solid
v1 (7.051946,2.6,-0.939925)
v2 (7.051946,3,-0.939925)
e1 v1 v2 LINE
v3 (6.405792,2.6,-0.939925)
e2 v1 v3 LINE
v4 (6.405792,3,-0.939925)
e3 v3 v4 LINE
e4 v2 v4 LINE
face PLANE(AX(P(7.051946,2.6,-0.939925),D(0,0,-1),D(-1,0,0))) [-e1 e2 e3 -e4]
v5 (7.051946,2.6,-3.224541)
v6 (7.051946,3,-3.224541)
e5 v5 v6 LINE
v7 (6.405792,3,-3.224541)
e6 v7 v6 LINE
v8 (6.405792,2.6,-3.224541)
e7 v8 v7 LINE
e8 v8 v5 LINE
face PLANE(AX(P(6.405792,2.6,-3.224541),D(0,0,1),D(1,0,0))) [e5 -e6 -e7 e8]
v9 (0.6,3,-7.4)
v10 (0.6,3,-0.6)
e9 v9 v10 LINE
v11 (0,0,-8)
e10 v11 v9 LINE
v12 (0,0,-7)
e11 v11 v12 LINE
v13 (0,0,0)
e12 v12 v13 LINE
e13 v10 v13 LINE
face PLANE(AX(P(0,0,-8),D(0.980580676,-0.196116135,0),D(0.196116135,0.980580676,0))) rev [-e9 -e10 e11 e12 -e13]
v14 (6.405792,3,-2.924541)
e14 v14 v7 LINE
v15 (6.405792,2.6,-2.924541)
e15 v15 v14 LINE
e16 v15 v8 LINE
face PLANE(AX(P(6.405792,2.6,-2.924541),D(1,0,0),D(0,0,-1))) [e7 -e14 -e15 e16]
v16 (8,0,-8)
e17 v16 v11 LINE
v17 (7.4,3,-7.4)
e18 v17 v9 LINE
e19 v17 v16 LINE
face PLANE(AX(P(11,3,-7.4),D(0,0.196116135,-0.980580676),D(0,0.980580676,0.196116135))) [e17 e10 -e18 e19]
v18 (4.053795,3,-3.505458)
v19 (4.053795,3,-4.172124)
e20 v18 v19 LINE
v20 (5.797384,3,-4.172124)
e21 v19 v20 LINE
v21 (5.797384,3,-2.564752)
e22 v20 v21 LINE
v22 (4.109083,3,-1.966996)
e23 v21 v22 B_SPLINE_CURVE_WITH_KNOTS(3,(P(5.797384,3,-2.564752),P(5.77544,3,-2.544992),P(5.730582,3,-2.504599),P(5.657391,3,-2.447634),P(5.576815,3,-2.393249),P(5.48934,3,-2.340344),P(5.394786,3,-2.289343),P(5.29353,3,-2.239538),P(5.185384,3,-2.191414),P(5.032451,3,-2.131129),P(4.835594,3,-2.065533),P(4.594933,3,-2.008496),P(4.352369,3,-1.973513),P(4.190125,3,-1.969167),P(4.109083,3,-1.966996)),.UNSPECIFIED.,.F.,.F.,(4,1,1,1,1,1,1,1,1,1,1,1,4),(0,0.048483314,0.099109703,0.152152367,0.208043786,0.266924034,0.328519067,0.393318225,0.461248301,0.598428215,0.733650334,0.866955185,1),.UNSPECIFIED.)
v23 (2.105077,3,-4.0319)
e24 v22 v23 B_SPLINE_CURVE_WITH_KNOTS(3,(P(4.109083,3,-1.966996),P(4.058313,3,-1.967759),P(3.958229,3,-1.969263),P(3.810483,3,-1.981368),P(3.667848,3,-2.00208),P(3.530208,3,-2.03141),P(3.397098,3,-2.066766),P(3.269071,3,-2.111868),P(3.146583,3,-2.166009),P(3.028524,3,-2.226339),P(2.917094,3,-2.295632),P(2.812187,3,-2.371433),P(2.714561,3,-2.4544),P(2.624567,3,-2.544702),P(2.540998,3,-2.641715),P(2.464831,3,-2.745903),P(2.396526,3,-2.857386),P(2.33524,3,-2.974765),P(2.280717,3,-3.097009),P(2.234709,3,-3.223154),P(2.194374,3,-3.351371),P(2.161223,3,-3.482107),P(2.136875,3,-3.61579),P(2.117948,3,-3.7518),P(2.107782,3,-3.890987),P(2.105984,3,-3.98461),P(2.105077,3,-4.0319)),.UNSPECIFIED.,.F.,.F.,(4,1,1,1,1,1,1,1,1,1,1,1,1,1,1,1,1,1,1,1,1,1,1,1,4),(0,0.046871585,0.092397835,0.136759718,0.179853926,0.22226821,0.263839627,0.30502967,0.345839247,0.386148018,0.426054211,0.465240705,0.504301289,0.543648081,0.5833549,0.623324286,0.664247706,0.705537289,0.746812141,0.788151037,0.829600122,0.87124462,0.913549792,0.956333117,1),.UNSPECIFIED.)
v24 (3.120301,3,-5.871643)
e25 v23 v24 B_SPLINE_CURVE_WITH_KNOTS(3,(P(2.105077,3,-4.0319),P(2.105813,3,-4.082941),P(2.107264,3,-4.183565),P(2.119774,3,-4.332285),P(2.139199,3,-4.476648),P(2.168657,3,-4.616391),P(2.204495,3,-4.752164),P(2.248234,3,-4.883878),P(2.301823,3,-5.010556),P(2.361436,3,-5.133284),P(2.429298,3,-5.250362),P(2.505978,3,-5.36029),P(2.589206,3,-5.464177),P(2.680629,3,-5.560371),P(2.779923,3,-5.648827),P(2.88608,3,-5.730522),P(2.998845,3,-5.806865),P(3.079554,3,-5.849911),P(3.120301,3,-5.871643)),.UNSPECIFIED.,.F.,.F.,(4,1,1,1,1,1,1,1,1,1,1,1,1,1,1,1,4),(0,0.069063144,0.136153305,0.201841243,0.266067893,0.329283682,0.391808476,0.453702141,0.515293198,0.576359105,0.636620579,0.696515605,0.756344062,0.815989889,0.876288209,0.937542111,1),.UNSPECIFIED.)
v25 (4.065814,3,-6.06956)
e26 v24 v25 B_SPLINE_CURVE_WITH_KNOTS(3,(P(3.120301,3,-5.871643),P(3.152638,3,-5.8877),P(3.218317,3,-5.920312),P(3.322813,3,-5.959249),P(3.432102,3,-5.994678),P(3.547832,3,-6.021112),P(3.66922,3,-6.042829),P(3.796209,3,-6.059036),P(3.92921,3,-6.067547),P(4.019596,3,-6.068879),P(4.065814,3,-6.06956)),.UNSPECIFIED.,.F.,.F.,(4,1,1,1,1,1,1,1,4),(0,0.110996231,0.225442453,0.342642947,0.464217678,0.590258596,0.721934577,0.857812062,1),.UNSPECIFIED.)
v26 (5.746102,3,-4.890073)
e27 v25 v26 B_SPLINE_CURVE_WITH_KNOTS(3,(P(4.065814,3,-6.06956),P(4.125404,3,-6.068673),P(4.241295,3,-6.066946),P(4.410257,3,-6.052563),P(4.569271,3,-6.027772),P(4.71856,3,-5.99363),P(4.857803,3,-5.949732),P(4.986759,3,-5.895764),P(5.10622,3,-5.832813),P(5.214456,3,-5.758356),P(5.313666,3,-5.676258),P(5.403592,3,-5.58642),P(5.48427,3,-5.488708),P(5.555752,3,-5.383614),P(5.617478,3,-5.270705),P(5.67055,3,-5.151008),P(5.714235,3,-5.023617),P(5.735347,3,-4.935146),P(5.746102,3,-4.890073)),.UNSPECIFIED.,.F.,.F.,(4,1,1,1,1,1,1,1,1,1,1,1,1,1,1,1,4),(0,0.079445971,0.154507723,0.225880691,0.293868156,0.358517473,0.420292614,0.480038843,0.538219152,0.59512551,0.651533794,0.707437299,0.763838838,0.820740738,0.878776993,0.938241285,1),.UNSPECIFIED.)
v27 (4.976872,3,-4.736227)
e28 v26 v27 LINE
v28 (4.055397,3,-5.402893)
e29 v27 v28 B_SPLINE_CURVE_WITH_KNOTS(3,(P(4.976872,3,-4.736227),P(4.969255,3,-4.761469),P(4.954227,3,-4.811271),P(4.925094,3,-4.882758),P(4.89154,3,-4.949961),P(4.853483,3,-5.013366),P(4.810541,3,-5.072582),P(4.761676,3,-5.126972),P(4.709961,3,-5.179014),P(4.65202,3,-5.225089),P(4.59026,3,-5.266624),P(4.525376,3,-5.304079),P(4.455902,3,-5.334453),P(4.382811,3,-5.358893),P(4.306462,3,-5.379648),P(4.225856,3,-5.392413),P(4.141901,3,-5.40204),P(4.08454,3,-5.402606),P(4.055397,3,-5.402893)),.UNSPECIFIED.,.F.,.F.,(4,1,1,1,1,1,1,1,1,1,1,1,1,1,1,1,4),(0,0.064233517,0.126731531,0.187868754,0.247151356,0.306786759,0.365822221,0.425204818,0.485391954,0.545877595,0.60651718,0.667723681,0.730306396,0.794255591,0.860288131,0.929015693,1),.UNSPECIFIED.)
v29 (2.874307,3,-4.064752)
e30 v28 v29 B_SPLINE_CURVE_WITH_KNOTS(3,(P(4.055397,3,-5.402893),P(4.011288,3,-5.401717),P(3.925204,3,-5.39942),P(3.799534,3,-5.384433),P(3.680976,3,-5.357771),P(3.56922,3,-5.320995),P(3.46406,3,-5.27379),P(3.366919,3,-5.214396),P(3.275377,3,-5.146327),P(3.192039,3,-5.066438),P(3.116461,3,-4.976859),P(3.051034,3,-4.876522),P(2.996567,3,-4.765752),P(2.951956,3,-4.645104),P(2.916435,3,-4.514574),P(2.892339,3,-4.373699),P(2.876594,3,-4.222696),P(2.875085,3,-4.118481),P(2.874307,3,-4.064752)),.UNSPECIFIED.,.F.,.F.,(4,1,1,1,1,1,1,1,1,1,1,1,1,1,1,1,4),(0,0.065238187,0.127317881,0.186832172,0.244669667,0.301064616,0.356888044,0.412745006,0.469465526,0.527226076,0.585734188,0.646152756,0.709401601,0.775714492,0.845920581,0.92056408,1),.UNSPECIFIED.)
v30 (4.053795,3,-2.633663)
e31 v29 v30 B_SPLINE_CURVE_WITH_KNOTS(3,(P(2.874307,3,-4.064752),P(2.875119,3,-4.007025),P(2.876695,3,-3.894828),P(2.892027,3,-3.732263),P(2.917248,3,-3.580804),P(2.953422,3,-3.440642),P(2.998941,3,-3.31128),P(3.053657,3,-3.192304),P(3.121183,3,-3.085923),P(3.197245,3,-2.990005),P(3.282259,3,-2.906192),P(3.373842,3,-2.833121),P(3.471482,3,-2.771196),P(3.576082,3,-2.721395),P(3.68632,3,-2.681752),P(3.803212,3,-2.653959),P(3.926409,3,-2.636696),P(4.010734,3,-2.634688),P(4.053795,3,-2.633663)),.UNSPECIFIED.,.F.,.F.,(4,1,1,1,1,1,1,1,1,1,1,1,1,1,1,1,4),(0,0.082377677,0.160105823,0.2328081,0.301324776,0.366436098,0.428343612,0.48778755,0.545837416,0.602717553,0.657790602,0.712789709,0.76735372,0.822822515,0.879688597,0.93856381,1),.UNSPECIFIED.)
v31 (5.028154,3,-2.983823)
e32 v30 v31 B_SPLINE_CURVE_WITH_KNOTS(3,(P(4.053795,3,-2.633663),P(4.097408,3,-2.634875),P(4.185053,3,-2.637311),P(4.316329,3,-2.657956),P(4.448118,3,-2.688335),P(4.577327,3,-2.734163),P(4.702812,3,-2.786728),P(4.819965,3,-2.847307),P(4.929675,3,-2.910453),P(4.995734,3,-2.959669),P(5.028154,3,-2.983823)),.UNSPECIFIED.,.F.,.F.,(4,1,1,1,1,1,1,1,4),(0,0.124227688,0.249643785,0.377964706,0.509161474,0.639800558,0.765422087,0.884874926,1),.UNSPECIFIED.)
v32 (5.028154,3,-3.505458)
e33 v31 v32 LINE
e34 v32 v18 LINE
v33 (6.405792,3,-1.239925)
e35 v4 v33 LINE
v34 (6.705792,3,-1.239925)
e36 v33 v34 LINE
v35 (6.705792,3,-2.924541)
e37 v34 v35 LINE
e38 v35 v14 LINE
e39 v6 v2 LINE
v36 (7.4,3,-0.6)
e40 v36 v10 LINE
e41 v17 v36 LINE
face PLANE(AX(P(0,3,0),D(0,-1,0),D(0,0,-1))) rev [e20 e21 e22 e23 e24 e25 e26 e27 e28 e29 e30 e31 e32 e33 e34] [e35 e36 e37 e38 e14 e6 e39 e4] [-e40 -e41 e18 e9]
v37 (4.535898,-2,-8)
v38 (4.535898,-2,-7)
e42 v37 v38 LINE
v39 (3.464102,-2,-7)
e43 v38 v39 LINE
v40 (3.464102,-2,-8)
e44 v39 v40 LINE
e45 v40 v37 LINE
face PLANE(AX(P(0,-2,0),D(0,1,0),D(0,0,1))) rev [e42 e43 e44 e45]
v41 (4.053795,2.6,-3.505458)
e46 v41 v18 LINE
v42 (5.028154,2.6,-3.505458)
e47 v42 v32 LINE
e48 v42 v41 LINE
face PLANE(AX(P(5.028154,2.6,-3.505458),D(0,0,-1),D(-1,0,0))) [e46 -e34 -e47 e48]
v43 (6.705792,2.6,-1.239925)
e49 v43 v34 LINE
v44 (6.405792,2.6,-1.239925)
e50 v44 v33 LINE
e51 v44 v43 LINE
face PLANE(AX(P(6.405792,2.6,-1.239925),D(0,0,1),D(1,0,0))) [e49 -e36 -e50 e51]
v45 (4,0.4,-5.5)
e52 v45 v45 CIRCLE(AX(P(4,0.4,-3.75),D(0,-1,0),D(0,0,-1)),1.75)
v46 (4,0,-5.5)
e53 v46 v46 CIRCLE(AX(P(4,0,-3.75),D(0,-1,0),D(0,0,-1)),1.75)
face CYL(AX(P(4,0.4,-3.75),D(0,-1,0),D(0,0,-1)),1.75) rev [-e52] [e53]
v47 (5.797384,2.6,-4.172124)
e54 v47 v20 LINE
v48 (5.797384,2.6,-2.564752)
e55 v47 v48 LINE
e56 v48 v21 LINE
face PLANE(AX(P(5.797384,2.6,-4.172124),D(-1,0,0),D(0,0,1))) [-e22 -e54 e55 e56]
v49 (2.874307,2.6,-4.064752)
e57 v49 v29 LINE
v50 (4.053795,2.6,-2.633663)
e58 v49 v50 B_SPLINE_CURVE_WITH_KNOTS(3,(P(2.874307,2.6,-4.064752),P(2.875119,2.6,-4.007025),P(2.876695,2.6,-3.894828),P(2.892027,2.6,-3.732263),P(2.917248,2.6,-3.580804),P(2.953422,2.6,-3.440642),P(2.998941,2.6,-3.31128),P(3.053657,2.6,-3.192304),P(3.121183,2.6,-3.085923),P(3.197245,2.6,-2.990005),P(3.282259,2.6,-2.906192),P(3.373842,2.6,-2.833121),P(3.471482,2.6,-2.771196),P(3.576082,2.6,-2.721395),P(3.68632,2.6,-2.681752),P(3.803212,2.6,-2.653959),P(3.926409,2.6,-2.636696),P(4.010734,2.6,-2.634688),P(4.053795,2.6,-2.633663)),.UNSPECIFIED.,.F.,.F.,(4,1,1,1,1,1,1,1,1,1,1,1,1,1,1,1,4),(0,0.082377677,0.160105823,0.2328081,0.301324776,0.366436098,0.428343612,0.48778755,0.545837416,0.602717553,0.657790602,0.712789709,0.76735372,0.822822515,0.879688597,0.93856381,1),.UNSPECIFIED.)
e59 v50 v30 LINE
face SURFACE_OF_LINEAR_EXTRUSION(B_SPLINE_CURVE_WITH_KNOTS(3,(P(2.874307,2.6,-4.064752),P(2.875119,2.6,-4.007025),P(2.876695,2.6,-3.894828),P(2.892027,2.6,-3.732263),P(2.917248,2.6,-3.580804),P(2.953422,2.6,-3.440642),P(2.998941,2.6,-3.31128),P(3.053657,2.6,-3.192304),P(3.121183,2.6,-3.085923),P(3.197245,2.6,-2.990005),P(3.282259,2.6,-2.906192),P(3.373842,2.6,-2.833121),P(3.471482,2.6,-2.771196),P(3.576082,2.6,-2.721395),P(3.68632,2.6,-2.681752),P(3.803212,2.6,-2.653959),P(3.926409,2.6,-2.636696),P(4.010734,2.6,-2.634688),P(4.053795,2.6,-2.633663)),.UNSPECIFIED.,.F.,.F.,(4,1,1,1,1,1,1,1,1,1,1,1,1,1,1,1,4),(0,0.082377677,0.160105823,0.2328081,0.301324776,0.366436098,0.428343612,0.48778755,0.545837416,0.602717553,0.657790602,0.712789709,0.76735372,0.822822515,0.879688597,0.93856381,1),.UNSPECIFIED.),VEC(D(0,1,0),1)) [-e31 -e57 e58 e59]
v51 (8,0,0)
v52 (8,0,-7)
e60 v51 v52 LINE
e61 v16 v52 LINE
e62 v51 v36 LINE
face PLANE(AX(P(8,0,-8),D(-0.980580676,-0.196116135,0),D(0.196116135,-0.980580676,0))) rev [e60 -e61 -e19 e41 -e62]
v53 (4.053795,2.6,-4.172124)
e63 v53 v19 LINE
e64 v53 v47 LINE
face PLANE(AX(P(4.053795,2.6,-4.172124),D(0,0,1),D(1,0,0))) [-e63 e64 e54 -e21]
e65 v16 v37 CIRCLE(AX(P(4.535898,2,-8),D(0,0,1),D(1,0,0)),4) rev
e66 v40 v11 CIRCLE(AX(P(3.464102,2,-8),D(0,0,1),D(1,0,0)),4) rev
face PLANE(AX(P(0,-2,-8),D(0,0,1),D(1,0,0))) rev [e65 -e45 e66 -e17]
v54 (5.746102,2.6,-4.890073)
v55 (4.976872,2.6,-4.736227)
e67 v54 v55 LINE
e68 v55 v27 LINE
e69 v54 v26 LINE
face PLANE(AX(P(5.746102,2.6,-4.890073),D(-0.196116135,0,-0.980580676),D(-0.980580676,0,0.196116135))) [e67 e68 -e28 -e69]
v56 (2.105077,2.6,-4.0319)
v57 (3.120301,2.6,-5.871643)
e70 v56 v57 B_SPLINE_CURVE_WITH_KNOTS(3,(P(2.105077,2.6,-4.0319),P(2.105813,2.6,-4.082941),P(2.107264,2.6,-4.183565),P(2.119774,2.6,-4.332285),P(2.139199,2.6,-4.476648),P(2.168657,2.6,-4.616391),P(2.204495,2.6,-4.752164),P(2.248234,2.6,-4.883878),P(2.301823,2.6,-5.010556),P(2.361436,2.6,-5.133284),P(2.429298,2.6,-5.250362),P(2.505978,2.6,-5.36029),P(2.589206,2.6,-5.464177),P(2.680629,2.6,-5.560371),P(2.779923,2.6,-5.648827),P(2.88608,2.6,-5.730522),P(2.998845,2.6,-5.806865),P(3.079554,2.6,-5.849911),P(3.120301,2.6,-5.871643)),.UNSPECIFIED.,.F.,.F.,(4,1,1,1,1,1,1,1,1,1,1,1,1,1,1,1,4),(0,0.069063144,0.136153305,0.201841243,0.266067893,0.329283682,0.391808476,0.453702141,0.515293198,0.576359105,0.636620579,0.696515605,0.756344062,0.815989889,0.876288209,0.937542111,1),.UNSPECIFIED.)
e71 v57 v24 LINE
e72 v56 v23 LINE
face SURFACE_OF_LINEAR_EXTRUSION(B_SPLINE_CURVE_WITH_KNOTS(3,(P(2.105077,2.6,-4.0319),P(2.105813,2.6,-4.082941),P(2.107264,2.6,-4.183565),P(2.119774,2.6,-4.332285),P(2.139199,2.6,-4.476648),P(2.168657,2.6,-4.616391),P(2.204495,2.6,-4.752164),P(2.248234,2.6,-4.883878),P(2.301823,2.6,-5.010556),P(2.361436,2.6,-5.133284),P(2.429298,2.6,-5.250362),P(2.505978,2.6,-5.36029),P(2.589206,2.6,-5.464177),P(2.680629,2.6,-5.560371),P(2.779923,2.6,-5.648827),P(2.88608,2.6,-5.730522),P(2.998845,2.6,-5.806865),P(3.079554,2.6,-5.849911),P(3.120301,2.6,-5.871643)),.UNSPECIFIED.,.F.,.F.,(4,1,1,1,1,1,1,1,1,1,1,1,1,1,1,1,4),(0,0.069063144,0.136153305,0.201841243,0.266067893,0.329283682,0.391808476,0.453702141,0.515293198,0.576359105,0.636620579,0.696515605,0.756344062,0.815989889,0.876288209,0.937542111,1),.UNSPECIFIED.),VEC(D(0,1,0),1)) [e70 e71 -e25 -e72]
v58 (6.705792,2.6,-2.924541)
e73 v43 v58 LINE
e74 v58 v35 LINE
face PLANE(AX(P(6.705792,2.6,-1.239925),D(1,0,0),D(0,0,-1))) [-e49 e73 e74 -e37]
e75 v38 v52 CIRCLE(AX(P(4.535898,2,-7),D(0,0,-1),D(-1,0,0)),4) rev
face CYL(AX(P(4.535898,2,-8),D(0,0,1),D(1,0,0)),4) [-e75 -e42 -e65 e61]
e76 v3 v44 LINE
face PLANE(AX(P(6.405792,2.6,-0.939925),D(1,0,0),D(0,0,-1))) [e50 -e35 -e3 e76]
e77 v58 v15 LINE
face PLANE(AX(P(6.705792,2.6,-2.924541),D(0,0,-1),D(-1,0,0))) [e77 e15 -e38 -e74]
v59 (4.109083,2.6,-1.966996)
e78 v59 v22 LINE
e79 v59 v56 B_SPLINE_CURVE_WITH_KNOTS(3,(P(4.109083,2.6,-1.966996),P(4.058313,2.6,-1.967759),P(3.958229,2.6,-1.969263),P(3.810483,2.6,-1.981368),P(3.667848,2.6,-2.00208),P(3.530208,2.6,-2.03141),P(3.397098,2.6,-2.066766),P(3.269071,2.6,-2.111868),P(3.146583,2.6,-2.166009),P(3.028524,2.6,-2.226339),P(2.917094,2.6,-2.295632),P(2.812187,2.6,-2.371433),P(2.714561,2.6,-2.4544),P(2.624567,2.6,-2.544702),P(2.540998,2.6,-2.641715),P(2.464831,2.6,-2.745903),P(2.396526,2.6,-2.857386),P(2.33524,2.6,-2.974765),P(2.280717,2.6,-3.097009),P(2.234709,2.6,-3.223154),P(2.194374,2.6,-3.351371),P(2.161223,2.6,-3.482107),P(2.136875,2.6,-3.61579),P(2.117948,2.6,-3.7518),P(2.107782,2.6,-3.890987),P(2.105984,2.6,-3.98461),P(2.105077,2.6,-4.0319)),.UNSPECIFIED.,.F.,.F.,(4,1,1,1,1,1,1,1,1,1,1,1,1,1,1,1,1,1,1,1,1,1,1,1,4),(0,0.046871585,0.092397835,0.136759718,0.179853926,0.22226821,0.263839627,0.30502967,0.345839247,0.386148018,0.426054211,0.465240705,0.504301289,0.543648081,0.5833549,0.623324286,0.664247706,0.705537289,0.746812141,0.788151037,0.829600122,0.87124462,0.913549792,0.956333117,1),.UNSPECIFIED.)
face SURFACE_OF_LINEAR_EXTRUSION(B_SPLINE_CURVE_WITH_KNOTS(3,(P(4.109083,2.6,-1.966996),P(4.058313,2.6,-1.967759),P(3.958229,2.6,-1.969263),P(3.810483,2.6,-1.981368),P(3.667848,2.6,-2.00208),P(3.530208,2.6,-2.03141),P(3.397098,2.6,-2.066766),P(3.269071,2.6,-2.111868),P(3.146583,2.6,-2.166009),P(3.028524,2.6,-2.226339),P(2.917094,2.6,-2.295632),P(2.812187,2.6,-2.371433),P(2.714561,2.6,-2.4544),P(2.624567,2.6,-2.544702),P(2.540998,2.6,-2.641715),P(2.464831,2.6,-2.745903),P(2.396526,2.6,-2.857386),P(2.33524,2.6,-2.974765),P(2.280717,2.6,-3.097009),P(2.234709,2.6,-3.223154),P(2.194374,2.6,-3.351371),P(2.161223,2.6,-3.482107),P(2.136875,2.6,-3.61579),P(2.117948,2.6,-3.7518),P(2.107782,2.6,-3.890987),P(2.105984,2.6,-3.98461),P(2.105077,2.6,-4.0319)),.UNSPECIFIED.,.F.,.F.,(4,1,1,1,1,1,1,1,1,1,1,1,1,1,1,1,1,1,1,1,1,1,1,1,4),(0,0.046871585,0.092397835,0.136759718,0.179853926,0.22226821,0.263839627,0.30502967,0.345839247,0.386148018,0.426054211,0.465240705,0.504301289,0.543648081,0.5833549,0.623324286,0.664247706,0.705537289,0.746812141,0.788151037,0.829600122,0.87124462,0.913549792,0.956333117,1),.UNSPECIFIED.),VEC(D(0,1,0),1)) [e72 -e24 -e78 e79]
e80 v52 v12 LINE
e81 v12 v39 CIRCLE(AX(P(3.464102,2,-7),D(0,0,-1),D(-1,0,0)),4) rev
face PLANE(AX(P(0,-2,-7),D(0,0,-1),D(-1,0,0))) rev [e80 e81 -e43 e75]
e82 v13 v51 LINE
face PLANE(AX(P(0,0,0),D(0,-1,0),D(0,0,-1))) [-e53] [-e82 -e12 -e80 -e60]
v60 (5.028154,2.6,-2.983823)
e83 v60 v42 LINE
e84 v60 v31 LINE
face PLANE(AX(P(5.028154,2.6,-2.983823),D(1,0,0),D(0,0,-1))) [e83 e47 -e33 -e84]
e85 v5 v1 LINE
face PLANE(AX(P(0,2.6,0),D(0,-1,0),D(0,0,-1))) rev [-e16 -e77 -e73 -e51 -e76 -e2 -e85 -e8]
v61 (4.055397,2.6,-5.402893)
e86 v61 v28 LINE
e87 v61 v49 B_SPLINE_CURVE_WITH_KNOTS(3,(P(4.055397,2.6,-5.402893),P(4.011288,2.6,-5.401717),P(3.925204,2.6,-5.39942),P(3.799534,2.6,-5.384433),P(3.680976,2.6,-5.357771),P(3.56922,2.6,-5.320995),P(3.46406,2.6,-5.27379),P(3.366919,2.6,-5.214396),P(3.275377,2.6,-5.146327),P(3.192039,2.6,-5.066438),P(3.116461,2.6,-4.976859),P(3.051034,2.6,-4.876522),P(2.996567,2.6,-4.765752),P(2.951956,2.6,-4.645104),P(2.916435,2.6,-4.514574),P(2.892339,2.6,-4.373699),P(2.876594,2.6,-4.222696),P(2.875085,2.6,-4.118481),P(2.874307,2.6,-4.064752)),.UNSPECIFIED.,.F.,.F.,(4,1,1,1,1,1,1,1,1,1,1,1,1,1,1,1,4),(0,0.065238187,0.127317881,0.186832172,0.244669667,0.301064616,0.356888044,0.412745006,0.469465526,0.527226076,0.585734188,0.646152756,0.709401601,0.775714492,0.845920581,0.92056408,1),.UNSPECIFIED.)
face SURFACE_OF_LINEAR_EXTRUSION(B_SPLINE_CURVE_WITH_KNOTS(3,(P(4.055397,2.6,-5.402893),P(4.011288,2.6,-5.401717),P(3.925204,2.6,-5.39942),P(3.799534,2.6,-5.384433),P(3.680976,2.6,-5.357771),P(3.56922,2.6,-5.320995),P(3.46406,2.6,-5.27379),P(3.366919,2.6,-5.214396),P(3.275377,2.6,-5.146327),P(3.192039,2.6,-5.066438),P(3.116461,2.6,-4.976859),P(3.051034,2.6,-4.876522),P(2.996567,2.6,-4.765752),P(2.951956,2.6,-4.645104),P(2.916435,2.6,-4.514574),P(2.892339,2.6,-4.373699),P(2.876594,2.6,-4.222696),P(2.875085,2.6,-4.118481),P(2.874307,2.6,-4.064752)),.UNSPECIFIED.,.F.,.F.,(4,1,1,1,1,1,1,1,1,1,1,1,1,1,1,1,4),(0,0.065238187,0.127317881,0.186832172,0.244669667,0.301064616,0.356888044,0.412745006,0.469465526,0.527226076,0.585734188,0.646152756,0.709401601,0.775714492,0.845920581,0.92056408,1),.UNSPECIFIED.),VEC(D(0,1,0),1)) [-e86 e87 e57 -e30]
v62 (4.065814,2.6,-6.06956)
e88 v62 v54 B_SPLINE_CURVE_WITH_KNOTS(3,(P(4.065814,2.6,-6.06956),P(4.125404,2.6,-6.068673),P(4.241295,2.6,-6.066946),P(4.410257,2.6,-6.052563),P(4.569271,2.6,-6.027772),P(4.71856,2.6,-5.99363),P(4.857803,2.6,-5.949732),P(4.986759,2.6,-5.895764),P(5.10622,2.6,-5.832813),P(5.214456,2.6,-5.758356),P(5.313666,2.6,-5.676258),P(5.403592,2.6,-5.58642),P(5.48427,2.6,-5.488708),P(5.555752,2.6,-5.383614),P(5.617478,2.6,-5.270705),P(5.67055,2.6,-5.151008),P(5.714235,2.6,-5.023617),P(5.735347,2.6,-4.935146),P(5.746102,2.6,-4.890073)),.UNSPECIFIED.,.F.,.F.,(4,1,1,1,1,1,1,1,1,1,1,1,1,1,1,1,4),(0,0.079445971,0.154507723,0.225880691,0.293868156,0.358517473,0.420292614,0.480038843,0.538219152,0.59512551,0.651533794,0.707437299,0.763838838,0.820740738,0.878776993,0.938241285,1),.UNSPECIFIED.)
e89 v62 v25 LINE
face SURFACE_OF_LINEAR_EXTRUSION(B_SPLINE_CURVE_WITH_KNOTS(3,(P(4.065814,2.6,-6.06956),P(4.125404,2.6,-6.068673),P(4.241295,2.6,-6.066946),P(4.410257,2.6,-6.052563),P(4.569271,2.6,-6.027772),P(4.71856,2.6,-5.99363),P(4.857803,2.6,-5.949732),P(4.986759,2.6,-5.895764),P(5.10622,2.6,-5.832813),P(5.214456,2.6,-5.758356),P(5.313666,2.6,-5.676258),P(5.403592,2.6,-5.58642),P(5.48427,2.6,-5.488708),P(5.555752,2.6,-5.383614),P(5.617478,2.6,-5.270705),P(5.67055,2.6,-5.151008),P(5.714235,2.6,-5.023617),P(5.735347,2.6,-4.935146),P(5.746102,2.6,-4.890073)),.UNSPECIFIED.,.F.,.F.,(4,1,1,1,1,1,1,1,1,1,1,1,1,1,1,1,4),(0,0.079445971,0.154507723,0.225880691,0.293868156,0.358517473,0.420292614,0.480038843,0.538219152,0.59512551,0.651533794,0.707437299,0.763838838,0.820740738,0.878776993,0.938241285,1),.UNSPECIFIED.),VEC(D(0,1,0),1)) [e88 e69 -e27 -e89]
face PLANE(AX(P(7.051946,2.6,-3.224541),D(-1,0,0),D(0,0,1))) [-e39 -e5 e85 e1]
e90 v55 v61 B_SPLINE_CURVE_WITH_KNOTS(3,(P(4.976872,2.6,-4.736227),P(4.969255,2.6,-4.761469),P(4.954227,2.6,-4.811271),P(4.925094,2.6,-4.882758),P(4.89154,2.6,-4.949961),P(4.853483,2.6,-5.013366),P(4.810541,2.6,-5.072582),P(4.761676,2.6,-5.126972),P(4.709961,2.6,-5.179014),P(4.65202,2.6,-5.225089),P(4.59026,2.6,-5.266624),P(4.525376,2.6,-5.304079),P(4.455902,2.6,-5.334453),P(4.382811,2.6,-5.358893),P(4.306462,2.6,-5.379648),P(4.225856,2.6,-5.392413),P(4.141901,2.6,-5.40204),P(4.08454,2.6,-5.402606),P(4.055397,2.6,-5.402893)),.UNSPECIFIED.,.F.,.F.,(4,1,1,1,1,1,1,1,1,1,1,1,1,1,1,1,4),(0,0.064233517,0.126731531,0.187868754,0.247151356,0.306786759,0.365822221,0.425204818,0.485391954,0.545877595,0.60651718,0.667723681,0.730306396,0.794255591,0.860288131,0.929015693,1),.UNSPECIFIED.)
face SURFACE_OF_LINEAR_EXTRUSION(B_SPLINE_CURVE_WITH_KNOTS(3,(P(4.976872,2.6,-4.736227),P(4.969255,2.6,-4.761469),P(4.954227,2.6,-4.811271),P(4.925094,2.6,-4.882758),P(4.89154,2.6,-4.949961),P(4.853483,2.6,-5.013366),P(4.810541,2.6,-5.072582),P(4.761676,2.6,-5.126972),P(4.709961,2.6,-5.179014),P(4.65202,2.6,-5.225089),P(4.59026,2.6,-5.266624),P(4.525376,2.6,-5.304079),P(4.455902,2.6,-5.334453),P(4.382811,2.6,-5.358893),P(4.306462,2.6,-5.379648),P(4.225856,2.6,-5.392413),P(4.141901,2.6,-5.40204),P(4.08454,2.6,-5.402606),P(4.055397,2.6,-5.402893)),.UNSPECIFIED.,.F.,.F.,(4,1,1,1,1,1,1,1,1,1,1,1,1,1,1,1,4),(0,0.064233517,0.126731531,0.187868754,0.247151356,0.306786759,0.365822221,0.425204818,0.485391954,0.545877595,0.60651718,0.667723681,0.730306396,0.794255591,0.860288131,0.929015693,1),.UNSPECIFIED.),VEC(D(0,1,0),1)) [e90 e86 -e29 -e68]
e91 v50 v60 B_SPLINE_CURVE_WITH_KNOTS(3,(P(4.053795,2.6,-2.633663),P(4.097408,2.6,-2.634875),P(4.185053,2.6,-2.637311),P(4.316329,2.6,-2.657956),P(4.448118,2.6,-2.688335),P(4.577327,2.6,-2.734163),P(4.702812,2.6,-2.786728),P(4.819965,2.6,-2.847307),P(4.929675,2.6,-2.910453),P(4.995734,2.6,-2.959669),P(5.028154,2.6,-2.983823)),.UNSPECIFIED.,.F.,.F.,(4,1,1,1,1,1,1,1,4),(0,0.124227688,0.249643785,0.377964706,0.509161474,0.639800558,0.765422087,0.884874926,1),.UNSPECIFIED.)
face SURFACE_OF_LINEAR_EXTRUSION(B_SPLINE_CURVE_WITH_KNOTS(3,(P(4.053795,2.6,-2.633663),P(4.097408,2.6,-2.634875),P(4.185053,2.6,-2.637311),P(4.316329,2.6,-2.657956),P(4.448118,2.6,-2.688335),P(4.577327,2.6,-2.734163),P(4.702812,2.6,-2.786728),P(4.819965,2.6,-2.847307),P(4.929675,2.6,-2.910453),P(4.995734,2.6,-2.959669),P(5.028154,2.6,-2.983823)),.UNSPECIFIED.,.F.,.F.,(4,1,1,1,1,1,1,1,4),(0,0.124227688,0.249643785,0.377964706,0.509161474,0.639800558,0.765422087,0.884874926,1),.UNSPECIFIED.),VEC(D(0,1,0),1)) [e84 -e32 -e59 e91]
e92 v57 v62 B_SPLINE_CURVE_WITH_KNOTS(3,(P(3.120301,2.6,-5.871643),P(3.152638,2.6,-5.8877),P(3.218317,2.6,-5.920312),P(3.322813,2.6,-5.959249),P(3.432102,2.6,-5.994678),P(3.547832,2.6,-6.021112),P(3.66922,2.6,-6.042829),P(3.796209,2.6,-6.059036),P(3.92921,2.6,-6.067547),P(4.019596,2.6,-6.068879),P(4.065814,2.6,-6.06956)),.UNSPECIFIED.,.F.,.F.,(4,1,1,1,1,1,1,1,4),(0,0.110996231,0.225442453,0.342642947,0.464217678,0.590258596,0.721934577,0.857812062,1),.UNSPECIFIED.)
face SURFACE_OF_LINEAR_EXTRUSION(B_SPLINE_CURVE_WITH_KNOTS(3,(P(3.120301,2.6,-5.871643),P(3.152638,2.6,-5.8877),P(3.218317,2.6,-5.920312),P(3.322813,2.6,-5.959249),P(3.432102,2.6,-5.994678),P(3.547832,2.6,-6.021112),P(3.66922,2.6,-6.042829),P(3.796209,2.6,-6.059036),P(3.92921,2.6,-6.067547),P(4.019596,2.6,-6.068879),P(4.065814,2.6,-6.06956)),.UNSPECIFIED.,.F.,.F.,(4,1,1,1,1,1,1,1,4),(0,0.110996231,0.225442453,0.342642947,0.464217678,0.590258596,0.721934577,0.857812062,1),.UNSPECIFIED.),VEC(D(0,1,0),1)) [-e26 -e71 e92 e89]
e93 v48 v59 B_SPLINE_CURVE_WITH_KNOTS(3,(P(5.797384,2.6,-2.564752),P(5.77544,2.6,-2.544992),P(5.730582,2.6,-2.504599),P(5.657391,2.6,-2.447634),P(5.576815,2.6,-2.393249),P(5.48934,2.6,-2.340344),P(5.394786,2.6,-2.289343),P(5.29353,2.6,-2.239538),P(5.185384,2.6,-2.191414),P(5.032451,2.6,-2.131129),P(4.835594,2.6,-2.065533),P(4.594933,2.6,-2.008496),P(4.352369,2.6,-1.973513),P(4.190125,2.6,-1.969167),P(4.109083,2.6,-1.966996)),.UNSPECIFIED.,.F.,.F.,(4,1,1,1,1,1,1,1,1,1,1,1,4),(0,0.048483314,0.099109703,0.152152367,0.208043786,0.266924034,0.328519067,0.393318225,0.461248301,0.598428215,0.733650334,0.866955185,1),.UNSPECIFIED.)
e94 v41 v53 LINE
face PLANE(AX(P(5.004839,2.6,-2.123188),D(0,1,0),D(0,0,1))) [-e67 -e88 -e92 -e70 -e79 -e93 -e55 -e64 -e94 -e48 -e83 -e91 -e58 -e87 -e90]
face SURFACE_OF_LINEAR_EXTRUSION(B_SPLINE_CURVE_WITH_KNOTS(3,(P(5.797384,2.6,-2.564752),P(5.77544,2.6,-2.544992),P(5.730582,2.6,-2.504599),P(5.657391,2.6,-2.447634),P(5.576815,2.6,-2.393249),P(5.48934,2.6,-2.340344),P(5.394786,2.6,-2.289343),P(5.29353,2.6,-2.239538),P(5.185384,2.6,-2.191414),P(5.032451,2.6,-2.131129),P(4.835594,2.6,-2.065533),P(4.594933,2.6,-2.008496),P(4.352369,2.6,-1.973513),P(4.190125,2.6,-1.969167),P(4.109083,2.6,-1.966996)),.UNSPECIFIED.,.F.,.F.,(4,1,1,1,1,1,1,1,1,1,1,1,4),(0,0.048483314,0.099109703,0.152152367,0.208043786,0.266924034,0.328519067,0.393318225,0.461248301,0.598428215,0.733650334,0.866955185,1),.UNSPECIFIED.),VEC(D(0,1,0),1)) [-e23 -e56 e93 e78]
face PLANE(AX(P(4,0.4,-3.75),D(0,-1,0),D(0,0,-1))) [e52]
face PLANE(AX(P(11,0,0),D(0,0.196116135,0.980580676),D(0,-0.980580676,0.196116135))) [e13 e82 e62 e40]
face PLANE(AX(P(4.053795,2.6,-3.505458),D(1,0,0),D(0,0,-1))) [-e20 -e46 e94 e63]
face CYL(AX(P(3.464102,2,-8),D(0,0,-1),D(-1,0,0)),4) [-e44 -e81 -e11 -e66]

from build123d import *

# Parameters (mm, degrees)
SKETCH1_W               = 8
SKETCH1_H               = 8
BOSS_EXTRUDE1_DEPTH     = 3
CUT_EXTRUDE1_DEPTH      = 12.704699911
CUT_EXTRUDE1_DEPTH_BACK = 12.704699911
CUT_EXTRUDE2_DEPTH      = 11
SKETCH4_R               = 1.75
CUT_EXTRUDE3_DEPTH      = 0.4
SKETCH5_W               = 8
SKETCH5_H               = 1
BOSS_EXTRUDE2_DEPTH     = 2
FILLET1_R               = 4
CUT_EXTRUDE4_DEPTH      = 0.4
CUT_EXTRUDE5_DEPTH      = 0.4


with BuildPart() as part:
    # Sketch1 → Boss-Extrude1 (new body)
    with BuildSketch(Plane(origin=(0, 0, 0), x_dir=(1, 0, 0), z_dir=(0, 1, 0))):
        with Locations((4, 4)):
            Rectangle(SKETCH1_W, SKETCH1_H)
    extrude(amount=BOSS_EXTRUDE1_DEPTH)

    # Sketch2 → Cut-Extrude1 (cut, two sides: drawn at the far end of the back side and taken through both)
    with BuildSketch(Plane.XY.offset(-CUT_EXTRUDE1_DEPTH_BACK)):
        Polygon((0, 0), (0.6, 3), (0, 3), align=None)
        Polygon((8, 0), (7.4, 3), (8, 3), align=None)
    extrude(amount=CUT_EXTRUDE1_DEPTH + CUT_EXTRUDE1_DEPTH_BACK, mode=Mode.SUBTRACT)

    # Sketch3 → Cut-Extrude2 (cut)
    with BuildSketch(Plane(origin=(0, 0, 0), x_dir=(0, 0, -1), z_dir=(1, 0, 0))):
        Polygon((0, 0), (0.6, 3), (0, 3), align=None)
        Polygon((8, 3), (7.4, 3), (8, 0), align=None)
    extrude(amount=CUT_EXTRUDE2_DEPTH, mode=Mode.SUBTRACT)

    # Sketch4 → Cut-Extrude3 (cut)
    with BuildSketch(Plane.XZ):
        with Locations(Location((4, -3.75, 0), (0, 0, 270))):
            Circle(SKETCH4_R)
    extrude(amount=-CUT_EXTRUDE3_DEPTH, mode=Mode.SUBTRACT)

    # Sketch5 → Boss-Extrude2 (add)
    with BuildSketch(Plane.XZ):
        with Locations((4, -7.5)):
            Rectangle(SKETCH5_W, SKETCH5_H)
    extrude(amount=BOSS_EXTRUDE2_DEPTH)

    # Fillet1
    # the kernel refuses this fillet: 4 mm, written as the material it takes off along each edge
    with BuildSketch(Plane(origin=(8, -2, -16.660254038), x_dir=(0, 1, 0), z_dir=(0, 0, 1)), Plane(origin=(0, -2, 1.660254038), x_dir=(0, 1, 0), z_dir=(0, 0, -1))) as fillet1_piece_1:
        with BuildLine():
            CenterArc((4, 3.464101615), FILLET1_R, 180, 60)
            Line((0, 3.464101615), (-0.08, 3.464101615))
            Line((-0.08, 3.464101615), (-0.08, 0))
            Line((-0.08, 0), (0, -0.08))
            ThreePointArc((0, -0.08), (1, -0.08), (1.96, -0.069282032))
            Line((1.96, -0.069282032), (2, 0))
        make_face()
    extrude(amount=18.320508076, mode=Mode.SUBTRACT)

    # Sketch6 → Cut-Extrude4 (cut)
    with BuildSketch(Plane(origin=(0, 3, 0), x_dir=(1, 0, 0), z_dir=(0, 1, 0))):
        with BuildLine():
            Line((4.053794593, 3.505457585), (4.053794593, 4.172124252))
            Line((4.053794593, 4.172124252), (5.797384337, 4.172124252))
            Line((5.797384337, 4.172124252), (5.797384337, 2.564752457))
            add(Edge.make_bspline(
                [(5.797384337, 2.564752457), (5.775440275, 2.544992361), (5.730582172, 2.504598726), (5.657391115, 2.447633596), (5.576814656, 2.393249062), (5.489339896, 2.340343698), (5.394785806, 2.289343315), (5.293529517, 2.239537607), (5.185384208, 2.19141366), (5.032450931, 2.131128575), (4.835594452, 2.065533422), (4.594933471, 2.008496304), (4.352368706, 1.973513189), (4.190125473, 1.969167013), (4.109083055, 1.966996047)],
                knots=[0, 0, 0, 0, 0.581799769, 1.189316438, 1.825828404, 2.496525428, 3.203088405, 3.942228803, 4.719818701, 5.534979611, 7.181138583, 8.803804008, 10.403462225, 12, 12, 12, 12], degree=3))
            add(Edge.make_bspline(
                [(4.109083055, 1.966996047), (4.058312627, 1.967758979), (3.958229013, 1.969262944), (3.810482794, 1.981368296), (3.667847904, 2.002080495), (3.530208107, 2.031409962), (3.397097502, 2.066765974), (3.26907094, 2.111868039), (3.146582956, 2.166009466), (3.028523806, 2.226338905), (2.917094396, 2.295632176), (2.812187083, 2.371432832), (2.714561168, 2.454400196), (2.624566637, 2.544701507), (2.540998329, 2.641714843), (2.464831298, 2.745902822), (2.396526155, 2.857385727), (2.335239765, 2.974765127), (2.280716867, 3.097008702), (2.234709094, 3.223154334), (2.194374003, 3.351370526), (2.161222966, 3.482107416), (2.136875151, 3.615790052), (2.117947657, 3.751799892), (2.107781758, 3.890986734), (2.105984472, 3.984609884), (2.105076645, 4.031899893)],
                knots=[0, 0, 0, 0, 1.124918047, 2.217548049, 3.282233239, 4.316494221, 5.334437038, 6.332151046, 7.320712088, 8.300141923, 9.267552434, 10.225301062, 11.165776911, 12.103230934, 13.047553934, 14.000517593, 14.959782875, 15.941944936, 16.932894943, 17.923491392, 18.915624898, 19.910402922, 20.909870877, 21.92519501, 22.95199481, 24, 24, 24, 24], degree=3))
            add(Edge.make_bspline(
                [(2.105076645, 4.031899893), (2.105812881, 4.082940857), (2.107264322, 4.183564655), (2.119773705, 4.33228546), (2.139199297, 4.476648194), (2.168656936, 4.616390773), (2.20449512, 4.75216369), (2.248233589, 4.883877531), (2.301822866, 5.010556427), (2.361436063, 5.133283761), (2.429297714, 5.250362339), (2.505977563, 5.360290437), (2.589206445, 5.464176802), (2.680629029, 5.560371285), (2.779923369, 5.648827012), (2.886080088, 5.730522243), (2.998844963, 5.806865303), (3.079553832, 5.849911113), (3.120301004, 5.871643482)],
                knots=[0, 0, 0, 0, 1.105010302, 2.178452875, 3.229459892, 4.257086284, 5.268538906, 6.268935615, 7.259234261, 8.24469117, 9.221745683, 10.185929258, 11.144249683, 12.101504986, 13.055838221, 14.020611351, 15.000673771, 16, 16, 16, 16], degree=3))
            add(Edge.make_bspline(
                [(3.120301004, 5.871643482), (3.152638085, 5.887700047), (3.218317351, 5.920312247), (3.322813337, 5.959248923), (3.432101667, 5.994677516), (3.547832356, 6.021111591), (3.6692195, 6.042829226), (3.796209305, 6.059036287), (3.929210312, 6.067547239), (4.019595582, 6.068879104), (4.065813824, 6.069560149)],
                knots=[0, 0, 0, 0, 0.887969848, 1.803539625, 2.741143579, 3.713741423, 4.722068772, 5.775476617, 6.8624965, 8, 8, 8, 8], degree=3))
            add(Edge.make_bspline(
                [(4.065813824, 6.069560149), (4.125403824, 6.06867255), (4.241295356, 6.066946335), (4.410256532, 6.05256252), (4.569271079, 6.027772487), (4.718560435, 5.993629866), (4.857802985, 5.949731518), (4.986759025, 5.895763799), (5.106220057, 5.832812796), (5.214455834, 5.758355608), (5.313666102, 5.676257846), (5.403591975, 5.586419647), (5.48426965, 5.488707943), (5.555752499, 5.383614392), (5.617477906, 5.2707046), (5.670549966, 5.151008328), (5.714234697, 5.023616882), (5.73534656, 4.935145779), (5.746102286, 4.89007297)],
                knots=[0, 0, 0, 0, 1.271135529, 2.472123572, 3.614091059, 4.701890498, 5.736279567, 6.724681829, 7.680621489, 8.611506429, 9.52200816, 10.424540711, 11.318996785, 12.221421405, 13.131851814, 14.060431888, 15.011860567, 16, 16, 16, 16], degree=3))
            Line((5.746102286, 4.89007297), (4.976871517, 4.736226816))
            add(Edge.make_bspline(
                [(4.976871517, 4.736226816), (4.969254672, 4.761468809), (4.95422678, 4.81127079), (4.925094227, 4.882758251), (4.891539922, 4.949961192), (4.853483379, 5.013366036), (4.810541206, 5.072582433), (4.761675926, 5.126971617), (4.709961453, 5.179014495), (4.652020351, 5.225088646), (4.590259767, 5.266624284), (4.52537561, 5.304078684), (4.455901775, 5.334453158), (4.382811411, 5.358892727), (4.306461756, 5.37964837), (4.225856415, 5.392413169), (4.141900573, 5.402040295), (4.084540473, 5.402606041), (4.055397158, 5.402893482)],
                knots=[0, 0, 0, 0, 1.027736275, 2.027704492, 3.005900071, 3.954421694, 4.908588141, 5.853155543, 6.803277083, 7.766271258, 8.734041521, 9.704274878, 10.683578894, 11.68490234, 12.708089448, 13.76461009, 14.864251086, 16, 16, 16, 16], degree=3))
            add(Edge.make_bspline(
                [(4.055397158, 5.402893482), (4.01128773, 5.401716629), (3.925204424, 5.399419898), (3.799534269, 5.384433236), (3.680976007, 5.357770589), (3.569219615, 5.320994553), (3.46406021, 5.273789934), (3.366918824, 5.2143961), (3.275376693, 5.146327474), (3.192038786, 5.066438045), (3.116460773, 4.976859168), (3.051034483, 4.876522357), (2.996567377, 4.765751945), (2.951955713, 4.645104141), (2.91643531, 4.514573915), (2.892338718, 4.373699188), (2.876594443, 4.222696077), (2.875085403, 4.118480819), (2.874307414, 4.064752457)],
                knots=[0, 0, 0, 0, 1.043810997, 2.037086103, 2.989314757, 3.91471467, 4.817033861, 5.710208705, 6.603920097, 7.511448416, 8.435617211, 9.371747005, 10.338444094, 11.350425613, 12.411431869, 13.5347293, 14.729025275, 16, 16, 16, 16], degree=3))
            add(Edge.make_bspline(
                [(2.874307414, 4.064752457), (2.875118698, 4.00702506), (2.876695474, 3.894828493), (2.892027057, 3.732262921), (2.917247643, 3.580803592), (2.95342224, 3.44064155), (2.998941149, 3.311279521), (3.053656914, 3.192304252), (3.121182779, 3.085923464), (3.197244894, 2.990004781), (3.28225913, 2.906191636), (3.37384152, 2.833121051), (3.471482188, 2.77119638), (3.576081527, 2.721395085), (3.686320303, 2.681751972), (3.80321198, 2.653959398), (3.926408504, 2.636695674), (4.010734238, 2.634687946), (4.053794593, 2.633662713)],
                knots=[0, 0, 0, 0, 1.318042826, 2.561693173, 3.724929596, 4.821196409, 5.862977565, 6.853497791, 7.804600806, 8.73339865, 9.643480846, 10.524649628, 11.404635349, 12.277659519, 13.165160235, 14.075017549, 15.017020959, 16, 16, 16, 16], degree=3))
            add(Edge.make_bspline(
                [(4.053794593, 2.633662713), (4.097408334, 2.634875039), (4.185053042, 2.637311287), (4.316328539, 2.657956024), (4.448117665, 2.68833542), (4.577327471, 2.734163302), (4.70281192, 2.786727561), (4.819965055, 2.847306941), (4.929675356, 2.910453005), (4.995733738, 2.959668979), (5.028153568, 2.98382297)],
                knots=[0, 0, 0, 0, 0.993821502, 1.997150276, 3.023717651, 4.073291794, 5.118404464, 6.123376694, 7.078999408, 8, 8, 8, 8], degree=3))
            Line((5.028153568, 2.98382297), (5.028153568, 3.505457585))
            Line((5.028153568, 3.505457585), (4.053794593, 3.505457585))
        make_face()
    extrude(amount=-CUT_EXTRUDE4_DEPTH, mode=Mode.SUBTRACT)

    # Sketch7 → Cut-Extrude5 (cut)
    with BuildSketch(Plane(origin=(0, 3, 0), x_dir=(1, 0, 0), z_dir=(0, 1, 0))):
        Polygon((7.051946272, 3.224540865), (7.051946272, 0.93992548), (6.405792426, 0.93992548), (6.405792426, 1.23992548), (6.705792426, 1.23992548), (6.705792426, 2.924540865), (6.405792426, 2.924540865), (6.405792426, 3.224540865), align=None)
    extrude(amount=-CUT_EXTRUDE5_DEPTH, mode=Mode.SUBTRACT)


solid = part.part
